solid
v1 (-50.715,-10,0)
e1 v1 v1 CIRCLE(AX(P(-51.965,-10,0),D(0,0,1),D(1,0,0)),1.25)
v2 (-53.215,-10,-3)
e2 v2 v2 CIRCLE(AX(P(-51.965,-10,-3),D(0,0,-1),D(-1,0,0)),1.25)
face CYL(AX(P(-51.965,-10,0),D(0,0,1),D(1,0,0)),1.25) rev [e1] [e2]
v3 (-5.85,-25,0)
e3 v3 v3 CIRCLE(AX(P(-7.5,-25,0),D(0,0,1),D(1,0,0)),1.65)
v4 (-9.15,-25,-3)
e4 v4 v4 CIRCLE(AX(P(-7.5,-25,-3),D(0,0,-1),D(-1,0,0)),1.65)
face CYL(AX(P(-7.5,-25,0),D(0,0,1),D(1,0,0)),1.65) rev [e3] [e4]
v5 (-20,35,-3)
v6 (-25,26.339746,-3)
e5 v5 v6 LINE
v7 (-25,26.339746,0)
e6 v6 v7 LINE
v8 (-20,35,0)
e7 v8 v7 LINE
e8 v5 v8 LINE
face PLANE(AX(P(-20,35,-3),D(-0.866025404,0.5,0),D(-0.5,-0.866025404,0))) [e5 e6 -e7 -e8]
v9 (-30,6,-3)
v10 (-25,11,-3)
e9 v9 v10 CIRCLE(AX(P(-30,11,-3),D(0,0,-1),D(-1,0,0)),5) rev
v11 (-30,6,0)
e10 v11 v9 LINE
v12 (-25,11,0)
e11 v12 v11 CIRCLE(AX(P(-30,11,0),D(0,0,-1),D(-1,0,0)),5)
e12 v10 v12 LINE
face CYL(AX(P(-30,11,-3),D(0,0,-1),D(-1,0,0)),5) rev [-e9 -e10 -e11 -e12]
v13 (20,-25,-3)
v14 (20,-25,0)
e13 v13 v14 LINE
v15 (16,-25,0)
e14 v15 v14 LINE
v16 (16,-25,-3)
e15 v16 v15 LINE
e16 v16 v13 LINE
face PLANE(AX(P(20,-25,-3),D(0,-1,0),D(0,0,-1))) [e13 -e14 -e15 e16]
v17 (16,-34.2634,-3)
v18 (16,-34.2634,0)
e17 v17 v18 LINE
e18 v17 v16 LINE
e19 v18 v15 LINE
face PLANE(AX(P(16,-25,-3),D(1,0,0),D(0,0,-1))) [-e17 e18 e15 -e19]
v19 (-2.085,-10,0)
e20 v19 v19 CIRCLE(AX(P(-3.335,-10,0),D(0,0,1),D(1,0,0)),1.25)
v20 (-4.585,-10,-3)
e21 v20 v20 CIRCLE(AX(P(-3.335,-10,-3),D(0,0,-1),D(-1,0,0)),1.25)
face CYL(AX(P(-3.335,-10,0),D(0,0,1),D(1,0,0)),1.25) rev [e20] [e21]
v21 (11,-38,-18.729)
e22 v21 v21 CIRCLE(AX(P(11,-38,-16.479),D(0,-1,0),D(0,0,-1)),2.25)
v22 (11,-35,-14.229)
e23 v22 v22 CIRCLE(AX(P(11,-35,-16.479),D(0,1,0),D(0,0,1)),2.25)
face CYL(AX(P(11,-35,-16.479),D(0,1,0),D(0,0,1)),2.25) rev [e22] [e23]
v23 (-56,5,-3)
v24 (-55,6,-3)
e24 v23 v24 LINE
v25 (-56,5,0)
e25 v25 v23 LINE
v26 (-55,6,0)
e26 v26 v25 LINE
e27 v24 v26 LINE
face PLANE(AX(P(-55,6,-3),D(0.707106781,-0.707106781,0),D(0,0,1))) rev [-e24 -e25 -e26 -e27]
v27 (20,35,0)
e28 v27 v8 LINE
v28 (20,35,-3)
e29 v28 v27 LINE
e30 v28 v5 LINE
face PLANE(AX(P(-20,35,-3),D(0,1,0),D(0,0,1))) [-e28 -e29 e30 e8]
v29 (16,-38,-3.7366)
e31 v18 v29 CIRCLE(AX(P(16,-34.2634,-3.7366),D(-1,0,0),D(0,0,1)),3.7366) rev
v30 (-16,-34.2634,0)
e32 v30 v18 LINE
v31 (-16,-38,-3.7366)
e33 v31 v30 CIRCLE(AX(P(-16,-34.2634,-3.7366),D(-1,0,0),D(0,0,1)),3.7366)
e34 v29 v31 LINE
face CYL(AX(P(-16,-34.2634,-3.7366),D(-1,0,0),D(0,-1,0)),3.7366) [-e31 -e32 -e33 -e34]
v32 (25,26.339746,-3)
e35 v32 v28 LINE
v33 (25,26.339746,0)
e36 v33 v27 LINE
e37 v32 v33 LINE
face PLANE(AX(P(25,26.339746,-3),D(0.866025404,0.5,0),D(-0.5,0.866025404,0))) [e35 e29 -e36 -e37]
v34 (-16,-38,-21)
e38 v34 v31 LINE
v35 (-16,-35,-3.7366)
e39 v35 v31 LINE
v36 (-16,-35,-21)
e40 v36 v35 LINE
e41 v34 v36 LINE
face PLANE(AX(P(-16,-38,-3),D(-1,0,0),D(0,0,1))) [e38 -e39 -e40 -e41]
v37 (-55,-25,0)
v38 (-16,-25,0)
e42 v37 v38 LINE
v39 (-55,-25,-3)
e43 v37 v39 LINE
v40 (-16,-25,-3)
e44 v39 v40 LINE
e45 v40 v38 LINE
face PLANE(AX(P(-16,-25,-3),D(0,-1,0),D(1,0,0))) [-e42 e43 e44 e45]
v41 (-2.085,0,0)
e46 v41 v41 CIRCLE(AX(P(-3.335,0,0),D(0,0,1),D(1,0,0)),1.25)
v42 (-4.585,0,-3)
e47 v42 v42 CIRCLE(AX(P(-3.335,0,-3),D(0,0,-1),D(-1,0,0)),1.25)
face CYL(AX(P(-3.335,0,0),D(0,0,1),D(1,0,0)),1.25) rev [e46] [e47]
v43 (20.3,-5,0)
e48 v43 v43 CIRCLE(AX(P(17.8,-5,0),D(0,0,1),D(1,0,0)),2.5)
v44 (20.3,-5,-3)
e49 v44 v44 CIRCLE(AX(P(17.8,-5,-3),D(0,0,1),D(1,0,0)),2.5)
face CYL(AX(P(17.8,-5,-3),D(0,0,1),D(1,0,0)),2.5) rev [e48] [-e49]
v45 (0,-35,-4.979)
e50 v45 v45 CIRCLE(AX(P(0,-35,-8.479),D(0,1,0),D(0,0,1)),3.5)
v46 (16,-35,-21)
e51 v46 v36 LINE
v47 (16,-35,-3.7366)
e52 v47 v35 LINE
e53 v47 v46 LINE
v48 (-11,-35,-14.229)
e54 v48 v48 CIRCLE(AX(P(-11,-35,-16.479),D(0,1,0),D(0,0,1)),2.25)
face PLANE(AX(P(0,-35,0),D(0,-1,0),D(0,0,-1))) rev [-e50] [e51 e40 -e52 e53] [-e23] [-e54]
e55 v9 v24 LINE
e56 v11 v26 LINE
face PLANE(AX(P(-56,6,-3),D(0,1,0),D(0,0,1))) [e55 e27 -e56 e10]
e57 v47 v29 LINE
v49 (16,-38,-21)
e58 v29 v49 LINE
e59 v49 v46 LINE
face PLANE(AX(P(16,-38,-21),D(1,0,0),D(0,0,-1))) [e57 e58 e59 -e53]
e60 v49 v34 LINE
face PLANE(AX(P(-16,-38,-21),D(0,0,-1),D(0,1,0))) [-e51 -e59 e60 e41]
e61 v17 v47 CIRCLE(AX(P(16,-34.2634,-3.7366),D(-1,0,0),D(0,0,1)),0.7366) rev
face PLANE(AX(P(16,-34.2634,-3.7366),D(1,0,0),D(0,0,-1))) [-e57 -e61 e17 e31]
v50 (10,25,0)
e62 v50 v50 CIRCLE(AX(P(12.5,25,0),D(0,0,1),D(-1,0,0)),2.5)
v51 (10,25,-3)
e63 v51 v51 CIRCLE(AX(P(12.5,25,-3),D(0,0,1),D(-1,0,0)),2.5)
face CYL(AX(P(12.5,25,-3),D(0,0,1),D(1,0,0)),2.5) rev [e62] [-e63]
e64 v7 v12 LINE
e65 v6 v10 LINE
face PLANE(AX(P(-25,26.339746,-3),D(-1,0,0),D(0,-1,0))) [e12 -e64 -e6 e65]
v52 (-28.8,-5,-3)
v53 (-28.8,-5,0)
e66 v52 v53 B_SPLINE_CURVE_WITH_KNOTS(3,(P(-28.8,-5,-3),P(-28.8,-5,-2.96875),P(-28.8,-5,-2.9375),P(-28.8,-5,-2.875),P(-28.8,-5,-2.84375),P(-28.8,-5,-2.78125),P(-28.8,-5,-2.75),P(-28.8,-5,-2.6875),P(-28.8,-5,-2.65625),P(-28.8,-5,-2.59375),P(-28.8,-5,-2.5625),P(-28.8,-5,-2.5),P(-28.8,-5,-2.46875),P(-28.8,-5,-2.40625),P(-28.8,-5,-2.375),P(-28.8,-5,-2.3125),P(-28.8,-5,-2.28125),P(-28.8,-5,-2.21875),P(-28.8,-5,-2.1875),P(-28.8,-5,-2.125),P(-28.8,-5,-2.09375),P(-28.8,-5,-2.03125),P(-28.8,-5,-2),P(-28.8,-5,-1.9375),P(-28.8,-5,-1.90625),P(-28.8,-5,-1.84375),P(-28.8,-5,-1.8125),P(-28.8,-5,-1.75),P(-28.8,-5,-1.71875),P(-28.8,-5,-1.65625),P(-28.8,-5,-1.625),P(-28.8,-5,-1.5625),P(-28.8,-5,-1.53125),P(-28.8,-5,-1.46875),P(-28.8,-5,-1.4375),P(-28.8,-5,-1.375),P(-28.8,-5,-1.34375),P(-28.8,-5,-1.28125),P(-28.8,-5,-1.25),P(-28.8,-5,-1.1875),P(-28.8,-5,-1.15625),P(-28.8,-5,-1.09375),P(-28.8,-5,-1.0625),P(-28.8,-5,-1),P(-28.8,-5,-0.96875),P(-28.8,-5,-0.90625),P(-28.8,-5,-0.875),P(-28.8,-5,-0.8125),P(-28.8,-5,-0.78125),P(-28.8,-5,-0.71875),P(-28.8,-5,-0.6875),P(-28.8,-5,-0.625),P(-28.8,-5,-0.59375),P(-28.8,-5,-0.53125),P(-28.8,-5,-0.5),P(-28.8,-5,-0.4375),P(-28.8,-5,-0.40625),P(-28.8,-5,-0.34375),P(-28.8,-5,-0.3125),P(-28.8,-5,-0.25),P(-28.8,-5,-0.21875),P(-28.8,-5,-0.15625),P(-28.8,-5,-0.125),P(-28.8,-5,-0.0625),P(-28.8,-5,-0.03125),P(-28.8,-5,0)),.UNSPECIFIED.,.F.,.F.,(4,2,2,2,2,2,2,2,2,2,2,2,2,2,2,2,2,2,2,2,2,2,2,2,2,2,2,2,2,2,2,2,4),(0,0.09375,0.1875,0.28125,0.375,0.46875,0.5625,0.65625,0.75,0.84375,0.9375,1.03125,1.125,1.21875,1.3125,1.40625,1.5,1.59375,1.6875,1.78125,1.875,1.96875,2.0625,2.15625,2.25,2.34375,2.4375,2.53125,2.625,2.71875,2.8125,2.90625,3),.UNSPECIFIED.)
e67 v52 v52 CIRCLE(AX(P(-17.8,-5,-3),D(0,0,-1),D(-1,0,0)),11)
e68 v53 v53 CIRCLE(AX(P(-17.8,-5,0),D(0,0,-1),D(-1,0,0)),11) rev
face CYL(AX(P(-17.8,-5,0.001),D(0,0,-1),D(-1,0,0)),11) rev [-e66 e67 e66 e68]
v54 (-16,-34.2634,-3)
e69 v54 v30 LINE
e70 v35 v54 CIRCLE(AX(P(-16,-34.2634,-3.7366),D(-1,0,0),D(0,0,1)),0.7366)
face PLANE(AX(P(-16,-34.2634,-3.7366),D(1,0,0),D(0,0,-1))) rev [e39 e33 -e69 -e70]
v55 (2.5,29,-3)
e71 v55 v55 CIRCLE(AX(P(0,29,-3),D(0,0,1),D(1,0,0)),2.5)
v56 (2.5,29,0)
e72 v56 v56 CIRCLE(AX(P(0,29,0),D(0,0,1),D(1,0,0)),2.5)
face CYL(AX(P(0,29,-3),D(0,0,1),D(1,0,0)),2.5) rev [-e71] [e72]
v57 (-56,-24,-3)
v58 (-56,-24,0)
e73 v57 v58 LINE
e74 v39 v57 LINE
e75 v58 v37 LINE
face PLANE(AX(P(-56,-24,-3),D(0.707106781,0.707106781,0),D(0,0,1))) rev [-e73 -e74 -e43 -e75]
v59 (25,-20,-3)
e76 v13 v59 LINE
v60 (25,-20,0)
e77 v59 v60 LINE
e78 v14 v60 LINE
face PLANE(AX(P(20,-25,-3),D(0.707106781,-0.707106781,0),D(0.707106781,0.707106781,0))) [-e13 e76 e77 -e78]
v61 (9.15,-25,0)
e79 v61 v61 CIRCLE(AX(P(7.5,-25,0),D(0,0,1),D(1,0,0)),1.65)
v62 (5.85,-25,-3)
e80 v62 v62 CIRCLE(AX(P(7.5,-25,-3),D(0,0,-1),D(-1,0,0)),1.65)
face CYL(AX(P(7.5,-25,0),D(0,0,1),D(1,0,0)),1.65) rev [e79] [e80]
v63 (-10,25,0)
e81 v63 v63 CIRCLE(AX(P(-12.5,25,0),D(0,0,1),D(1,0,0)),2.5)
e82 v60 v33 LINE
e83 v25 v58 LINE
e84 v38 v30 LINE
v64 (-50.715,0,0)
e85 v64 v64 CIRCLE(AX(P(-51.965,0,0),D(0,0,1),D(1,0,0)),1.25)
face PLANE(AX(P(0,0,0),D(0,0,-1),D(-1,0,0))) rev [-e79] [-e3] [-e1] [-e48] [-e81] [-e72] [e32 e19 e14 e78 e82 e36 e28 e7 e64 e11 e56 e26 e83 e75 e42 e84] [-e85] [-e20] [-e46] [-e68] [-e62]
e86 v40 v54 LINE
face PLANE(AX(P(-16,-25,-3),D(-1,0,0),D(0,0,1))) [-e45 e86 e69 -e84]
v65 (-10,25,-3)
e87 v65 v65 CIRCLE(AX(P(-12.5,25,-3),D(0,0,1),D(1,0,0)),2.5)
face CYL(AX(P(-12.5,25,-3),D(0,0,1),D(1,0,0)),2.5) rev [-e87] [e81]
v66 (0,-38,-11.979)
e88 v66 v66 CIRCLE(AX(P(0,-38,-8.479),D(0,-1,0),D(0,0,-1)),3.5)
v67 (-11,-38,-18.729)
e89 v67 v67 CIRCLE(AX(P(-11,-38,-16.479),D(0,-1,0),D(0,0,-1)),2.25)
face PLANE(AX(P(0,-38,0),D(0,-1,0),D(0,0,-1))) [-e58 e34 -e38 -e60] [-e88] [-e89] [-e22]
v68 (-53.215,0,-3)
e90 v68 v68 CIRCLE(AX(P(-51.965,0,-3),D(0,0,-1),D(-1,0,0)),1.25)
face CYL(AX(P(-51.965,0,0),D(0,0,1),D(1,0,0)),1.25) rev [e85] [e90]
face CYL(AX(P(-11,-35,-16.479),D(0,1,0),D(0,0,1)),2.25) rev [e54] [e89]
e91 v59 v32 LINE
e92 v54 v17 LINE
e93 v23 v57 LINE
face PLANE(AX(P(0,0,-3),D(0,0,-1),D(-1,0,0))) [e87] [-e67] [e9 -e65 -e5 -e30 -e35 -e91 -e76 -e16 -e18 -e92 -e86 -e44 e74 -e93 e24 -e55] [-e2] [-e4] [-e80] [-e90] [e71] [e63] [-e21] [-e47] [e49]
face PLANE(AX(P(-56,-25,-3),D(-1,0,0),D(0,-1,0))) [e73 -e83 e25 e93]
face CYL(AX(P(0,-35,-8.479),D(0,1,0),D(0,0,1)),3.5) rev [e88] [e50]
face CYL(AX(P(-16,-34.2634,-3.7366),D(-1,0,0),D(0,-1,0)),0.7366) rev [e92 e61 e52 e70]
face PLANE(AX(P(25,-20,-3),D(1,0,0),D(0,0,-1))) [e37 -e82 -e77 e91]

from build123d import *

# Parameters (mm, degrees)
SM_BASE_FLANGE_1_DEPTH           = 3
SKETCH_6_R                       = 2.5
CUT_EXTRUDE_1_DEPTH              = 3
CUT_EXTRUDE_2_REACH              = 68.106
SKETCH_9_R                       = 11
HOLE_WIZARD_M3_1_D               = 2.5
HOLE_WIZARD_M3_1_DEPTH           = 7.5
HOLE_WIZARD_M3_1_TIP             = 0.751075774
SM_EDGE_FLANGE_1_STRIP_W         = 13.4732
SM_EDGE_FLANGE_1_STRIP_H         = 3
SM_EDGE_FLANGE_1_STRIP_CUT_DEPTH = 32
SM_EDGE_FLANGE_1_DEPTH           = 32
HOLE_WIZARD_7_0_7_D              = 7
HOLE_WIZARD_7_0_7_DEPTH          = 6
HOLE_WIZARD_7_0_7_TIP            = 2.103012167
FILLET_1_R                       = 5
CHAMFER_1_SIZE                   = 1
HOLE_WIZARD_4_5_4_5_1_D          = 4.5
HOLE_WIZARD_4_5_4_5_1_DEPTH      = 5
HOLE_WIZARD_4_5_4_5_1_TIP        = 1.351936393
HOLE_WIZARD_M4_1_D               = 3.3
HOLE_WIZARD_M4_1_DEPTH           = 11.5
HOLE_WIZARD_M4_1_TIP             = 0.991420021


# Sheet-metal steps are written as plain solids
with BuildPart() as part:
    # Sketch 1 → 基体-法兰1 (new body)
    with BuildSketch(Plane.XY):
        Polygon((20, -25), (16, -25), (16, -35), (-16, -35), (-16, -25), (-56, -25), (-56, 6), (-25, 6), (-25, 26.339745962), (-20, 35), (20, 35), (25, 26.339745962), (25, -20), align=None)
    extrude(amount=-SM_BASE_FLANGE_1_DEPTH)

    # Sketch 6 → 切除-拉伸1 (cut)
    with BuildSketch(Plane.XY):
        with Locations((-17.8, -5)):
            Circle(SKETCH_6_R)
        with Locations((17.8, -5)):
            Circle(SKETCH_6_R)
        with Locations((0, 29)):
            Circle(SKETCH_6_R)
        with Locations((-12.5, 25)):
            Circle(SKETCH_6_R)
        with Locations(Location((12.5, 25, 0), (0, 0, 180))):
            Circle(SKETCH_6_R)
    extrude(amount=-CUT_EXTRUDE_1_DEPTH, mode=Mode.SUBTRACT)

    # Sketch 9 → 切除-拉伸2 (cut, up to next)
    with BuildSketch(Plane(origin=(0, 0, -3), x_dir=(-1, 0, 0), z_dir=(0, 0, -1)), mode=Mode.PRIVATE) as cut_extrude_2_sk1:
        with Locations((17.8, -5)):
            Circle(SKETCH_9_R)
    cut_extrude_2_tool1 = extrude(cut_extrude_2_sk1.sketch, amount=-CUT_EXTRUDE_2_REACH, mode=Mode.PRIVATE) & part.part
    add(cut_extrude_2_tool1.solids().sort_by_distance((-17.8, -5, -3))[0], mode=Mode.SUBTRACT)

    # M3 螺纹孔1
    with Locations(Plane(origin=(0, -38, 0), x_dir=(-1, 0, 0), z_dir=(0, 0, 1))):
        with Locations((51.965, -38), (51.965, -28), (3.335, -28), (3.335, -38)):
            Hole(HOLE_WIZARD_M3_1_D / 2, depth=HOLE_WIZARD_M3_1_DEPTH)
            with Locations((0, 0, -(HOLE_WIZARD_M3_1_DEPTH + HOLE_WIZARD_M3_1_TIP / 2))):  # 118° drill point
                Cone(0, HOLE_WIZARD_M3_1_D / 2, HOLE_WIZARD_M3_1_TIP, mode=Mode.SUBTRACT)

    # 边线-法兰1 strip (across the edge) → 边线-法兰1 strip cut (cut)
    with BuildSketch(Plane(origin=(16, -35, -3), x_dir=(0, 1, 0), z_dir=(-1, 0, 0))):
        with Locations((-6, -1.5)):
            Rectangle(SM_EDGE_FLANGE_1_STRIP_W, SM_EDGE_FLANGE_1_STRIP_H)
    extrude(amount=SM_EDGE_FLANGE_1_STRIP_CUT_DEPTH, mode=Mode.SUBTRACT)

    # 边线-法兰1 section (across the edge) → 边线-法兰1 (add)
    with BuildSketch(Plane(origin=(16, -35, -3), x_dir=(0, 1, 0), z_dir=(-1, 0, 0))):
        with BuildLine():
            Line((-3, 0.7366), (-3, 18))
            Line((-3, 18), (0, 18))
            Line((0, 18), (0, 0.7366))
            ThreePointArc((0, 0.7366), (0.215745145, 0.215745145), (0.7366, 0))
            Line((0.7366, 0), (0.7366, -3))
            ThreePointArc((0.7366, -3), (-1.905575199, -1.905575199), (-3, 0.7366))
        make_face()
    extrude(amount=SM_EDGE_FLANGE_1_DEPTH)

    # Ø7.0 (7) 直径孔
    with Locations(Plane(origin=(-9.85, -35, 1.271), x_dir=(1, 0, 0), z_dir=(0, 1, 0))):
        with Locations((9.85, 9.75)):
            Hole(HOLE_WIZARD_7_0_7_D / 2, depth=HOLE_WIZARD_7_0_7_DEPTH)
            with Locations((0, 0, -(HOLE_WIZARD_7_0_7_DEPTH + HOLE_WIZARD_7_0_7_TIP / 2))):  # 118° drill point
                Cone(0, HOLE_WIZARD_7_0_7_D / 2, HOLE_WIZARD_7_0_7_TIP, mode=Mode.SUBTRACT)

    # 圆角1
    fillet_1_edges = [part.edges().sort_by_distance(p)[0] for p in [
        (-25, 6, -1.5),
    ]]
    fillet(fillet_1_edges, radius=FILLET_1_R)

    # 倒角1
    chamfer_1_edges = [part.edges().sort_by_distance(p)[0] for p in [
        (-56, -25, -1.5),
        (-56, 6, -1.5),
    ]]
    chamfer(chamfer_1_edges, length=CHAMFER_1_SIZE)

    # Ø4.5 (4.5) 直径孔1
    with Locations(Plane(origin=(-9.85, -35, 1.271), x_dir=(1, 0, 0), z_dir=(0, 1, 0))):
        with Locations((-1.15, 17.75), (20.85, 17.75)):
            Hole(HOLE_WIZARD_4_5_4_5_1_D / 2, depth=HOLE_WIZARD_4_5_4_5_1_DEPTH)
            with Locations((0, 0, -(HOLE_WIZARD_4_5_4_5_1_DEPTH + HOLE_WIZARD_4_5_4_5_1_TIP / 2))):  # 118° drill point
                Cone(0, HOLE_WIZARD_4_5_4_5_1_D / 2, HOLE_WIZARD_4_5_4_5_1_TIP, mode=Mode.SUBTRACT)

    # M4 螺纹孔1
    with Locations(Plane(origin=(-9.85, -49.5, 0), x_dir=(-1, 0, 0), z_dir=(0, 0, 1))):
        with Locations((-2.35, -24.5), (-17.35, -24.5)):
            Hole(HOLE_WIZARD_M4_1_D / 2, depth=HOLE_WIZARD_M4_1_DEPTH)
            with Locations((0, 0, -(HOLE_WIZARD_M4_1_DEPTH + HOLE_WIZARD_M4_1_TIP / 2))):  # 118° drill point
                Cone(0, HOLE_WIZARD_M4_1_D / 2, HOLE_WIZARD_M4_1_TIP, mode=Mode.SUBTRACT)


solid = part.part
